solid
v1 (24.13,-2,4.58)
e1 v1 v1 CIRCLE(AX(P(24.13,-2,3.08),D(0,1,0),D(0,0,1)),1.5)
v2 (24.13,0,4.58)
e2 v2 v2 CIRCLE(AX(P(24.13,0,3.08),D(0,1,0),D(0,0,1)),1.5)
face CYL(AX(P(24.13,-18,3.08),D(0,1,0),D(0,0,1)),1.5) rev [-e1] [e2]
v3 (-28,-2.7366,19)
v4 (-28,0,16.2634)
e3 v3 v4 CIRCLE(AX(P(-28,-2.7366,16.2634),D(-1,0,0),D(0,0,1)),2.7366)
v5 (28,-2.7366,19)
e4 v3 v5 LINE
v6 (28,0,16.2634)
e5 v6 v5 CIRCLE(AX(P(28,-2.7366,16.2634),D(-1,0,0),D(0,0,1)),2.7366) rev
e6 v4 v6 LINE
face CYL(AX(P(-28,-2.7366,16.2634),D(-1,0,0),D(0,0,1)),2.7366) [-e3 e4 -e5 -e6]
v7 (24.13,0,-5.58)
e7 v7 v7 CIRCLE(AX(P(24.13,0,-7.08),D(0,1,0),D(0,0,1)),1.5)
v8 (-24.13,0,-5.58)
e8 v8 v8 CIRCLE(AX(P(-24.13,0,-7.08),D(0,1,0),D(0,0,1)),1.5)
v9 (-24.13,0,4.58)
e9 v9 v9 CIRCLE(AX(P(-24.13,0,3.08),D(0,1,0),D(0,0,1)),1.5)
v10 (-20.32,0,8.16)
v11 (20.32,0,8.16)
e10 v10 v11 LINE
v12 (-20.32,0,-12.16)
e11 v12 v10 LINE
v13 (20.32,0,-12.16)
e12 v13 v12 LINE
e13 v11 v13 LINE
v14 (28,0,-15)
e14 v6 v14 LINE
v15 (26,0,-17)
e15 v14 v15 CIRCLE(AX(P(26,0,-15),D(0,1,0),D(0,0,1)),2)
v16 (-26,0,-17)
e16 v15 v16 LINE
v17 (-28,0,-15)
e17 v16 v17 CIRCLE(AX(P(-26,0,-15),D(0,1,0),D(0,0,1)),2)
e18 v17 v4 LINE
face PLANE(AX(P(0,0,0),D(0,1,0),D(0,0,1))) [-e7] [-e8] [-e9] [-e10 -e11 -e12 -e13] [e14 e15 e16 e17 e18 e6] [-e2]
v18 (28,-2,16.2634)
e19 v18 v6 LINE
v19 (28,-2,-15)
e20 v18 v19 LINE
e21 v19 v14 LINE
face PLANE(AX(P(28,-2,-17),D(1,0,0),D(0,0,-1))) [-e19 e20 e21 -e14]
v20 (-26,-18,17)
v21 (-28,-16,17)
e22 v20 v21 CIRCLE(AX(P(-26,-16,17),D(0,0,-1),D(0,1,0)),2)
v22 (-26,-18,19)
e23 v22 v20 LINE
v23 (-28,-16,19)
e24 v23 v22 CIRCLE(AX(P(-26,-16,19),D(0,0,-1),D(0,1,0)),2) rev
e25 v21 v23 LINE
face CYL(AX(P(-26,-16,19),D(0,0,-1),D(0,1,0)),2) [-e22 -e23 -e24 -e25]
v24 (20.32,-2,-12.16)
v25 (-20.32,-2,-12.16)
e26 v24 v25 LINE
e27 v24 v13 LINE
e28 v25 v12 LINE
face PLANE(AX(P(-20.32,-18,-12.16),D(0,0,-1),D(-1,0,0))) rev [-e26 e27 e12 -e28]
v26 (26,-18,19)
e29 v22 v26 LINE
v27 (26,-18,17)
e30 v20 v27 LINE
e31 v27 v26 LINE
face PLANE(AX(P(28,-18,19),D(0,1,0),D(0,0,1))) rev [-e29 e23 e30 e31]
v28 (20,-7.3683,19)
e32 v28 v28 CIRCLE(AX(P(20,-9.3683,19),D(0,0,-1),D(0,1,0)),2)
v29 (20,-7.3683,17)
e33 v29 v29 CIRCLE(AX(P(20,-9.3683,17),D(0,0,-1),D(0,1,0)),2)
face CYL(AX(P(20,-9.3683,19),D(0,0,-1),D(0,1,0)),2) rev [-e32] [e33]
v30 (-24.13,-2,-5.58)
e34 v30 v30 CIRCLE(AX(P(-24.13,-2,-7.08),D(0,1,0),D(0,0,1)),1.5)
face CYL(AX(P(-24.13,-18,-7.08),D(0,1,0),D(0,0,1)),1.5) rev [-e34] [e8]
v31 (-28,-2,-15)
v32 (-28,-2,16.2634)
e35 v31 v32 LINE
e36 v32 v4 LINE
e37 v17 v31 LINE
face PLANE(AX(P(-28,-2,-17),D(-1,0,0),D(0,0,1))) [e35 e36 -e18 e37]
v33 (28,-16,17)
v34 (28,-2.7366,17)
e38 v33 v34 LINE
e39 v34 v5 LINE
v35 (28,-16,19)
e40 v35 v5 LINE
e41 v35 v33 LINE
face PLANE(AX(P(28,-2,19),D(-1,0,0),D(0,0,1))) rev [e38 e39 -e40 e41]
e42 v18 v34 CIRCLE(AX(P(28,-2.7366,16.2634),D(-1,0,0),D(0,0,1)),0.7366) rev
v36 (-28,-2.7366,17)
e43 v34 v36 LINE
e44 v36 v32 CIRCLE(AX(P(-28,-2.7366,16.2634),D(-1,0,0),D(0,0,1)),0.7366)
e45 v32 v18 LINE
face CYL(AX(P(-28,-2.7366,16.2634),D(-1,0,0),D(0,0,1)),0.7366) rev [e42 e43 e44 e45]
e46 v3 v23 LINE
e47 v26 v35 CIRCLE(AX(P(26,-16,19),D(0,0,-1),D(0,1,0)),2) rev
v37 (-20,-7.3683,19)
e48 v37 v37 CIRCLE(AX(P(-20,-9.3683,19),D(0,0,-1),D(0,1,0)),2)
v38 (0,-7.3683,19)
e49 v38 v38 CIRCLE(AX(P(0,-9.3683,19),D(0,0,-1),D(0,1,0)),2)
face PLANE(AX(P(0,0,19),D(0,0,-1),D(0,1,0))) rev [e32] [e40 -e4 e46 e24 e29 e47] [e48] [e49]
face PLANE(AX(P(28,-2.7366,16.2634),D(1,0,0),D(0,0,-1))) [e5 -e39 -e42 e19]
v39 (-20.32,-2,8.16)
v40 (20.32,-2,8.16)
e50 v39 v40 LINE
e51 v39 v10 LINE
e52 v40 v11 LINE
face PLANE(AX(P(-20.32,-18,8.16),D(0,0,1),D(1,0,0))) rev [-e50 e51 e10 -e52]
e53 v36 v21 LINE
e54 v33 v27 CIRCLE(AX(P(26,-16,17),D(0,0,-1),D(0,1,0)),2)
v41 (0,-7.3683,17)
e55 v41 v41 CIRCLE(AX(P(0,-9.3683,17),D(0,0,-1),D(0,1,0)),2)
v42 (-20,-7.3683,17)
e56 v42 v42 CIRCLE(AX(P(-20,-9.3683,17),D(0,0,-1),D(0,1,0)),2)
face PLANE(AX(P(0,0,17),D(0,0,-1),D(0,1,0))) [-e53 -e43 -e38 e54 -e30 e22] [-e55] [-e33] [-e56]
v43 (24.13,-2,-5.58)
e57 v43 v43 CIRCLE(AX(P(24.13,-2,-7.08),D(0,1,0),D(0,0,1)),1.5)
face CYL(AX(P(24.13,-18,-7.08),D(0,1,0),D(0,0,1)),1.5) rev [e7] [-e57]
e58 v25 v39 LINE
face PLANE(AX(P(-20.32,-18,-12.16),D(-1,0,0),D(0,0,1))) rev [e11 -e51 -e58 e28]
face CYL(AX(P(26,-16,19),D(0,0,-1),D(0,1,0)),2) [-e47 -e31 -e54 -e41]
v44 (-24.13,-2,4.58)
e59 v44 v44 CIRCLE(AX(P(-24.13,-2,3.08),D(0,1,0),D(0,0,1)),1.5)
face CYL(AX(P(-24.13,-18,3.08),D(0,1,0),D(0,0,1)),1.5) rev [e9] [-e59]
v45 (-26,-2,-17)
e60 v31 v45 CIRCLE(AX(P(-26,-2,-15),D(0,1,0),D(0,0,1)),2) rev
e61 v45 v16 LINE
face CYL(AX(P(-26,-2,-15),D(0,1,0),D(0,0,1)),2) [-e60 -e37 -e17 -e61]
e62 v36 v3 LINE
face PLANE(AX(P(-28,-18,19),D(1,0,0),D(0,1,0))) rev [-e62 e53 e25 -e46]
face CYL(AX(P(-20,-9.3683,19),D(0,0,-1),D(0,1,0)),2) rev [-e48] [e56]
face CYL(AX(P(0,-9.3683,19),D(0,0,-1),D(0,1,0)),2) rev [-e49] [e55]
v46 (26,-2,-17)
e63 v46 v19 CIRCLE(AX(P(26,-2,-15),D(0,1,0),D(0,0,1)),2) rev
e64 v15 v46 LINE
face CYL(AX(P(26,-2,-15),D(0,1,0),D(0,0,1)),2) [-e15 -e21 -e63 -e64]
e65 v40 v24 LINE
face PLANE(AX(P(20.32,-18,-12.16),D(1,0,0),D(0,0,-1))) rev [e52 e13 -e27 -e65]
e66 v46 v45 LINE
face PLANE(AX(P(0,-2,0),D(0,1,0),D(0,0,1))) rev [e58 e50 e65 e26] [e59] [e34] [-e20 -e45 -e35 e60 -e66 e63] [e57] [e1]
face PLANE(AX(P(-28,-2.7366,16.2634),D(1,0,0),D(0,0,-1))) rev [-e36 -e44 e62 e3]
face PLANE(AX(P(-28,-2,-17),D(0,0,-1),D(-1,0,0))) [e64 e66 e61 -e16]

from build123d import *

# Parameters (mm, degrees)
SKETCH1_W                    = 56
SKETCH1_H                    = 34
BASE_FLANGE1_DEPTH           = 2
EDGE_FLANGE1_STRIP_W         = 9.4732
EDGE_FLANGE1_STRIP_H         = 2
EDGE_FLANGE1_STRIP_CUT_DEPTH = 56
EDGE_FLANGE1_DEPTH           = 56
SKETCH9_W                    = 40.64
SKETCH9_H                    = 20.32
CUT_EXTRUDE1_DEPTH           = 39.327535793
SKETCH10_R                   = 1.5
CUT_EXTRUDE2_DEPTH           = 39.327535793
FILLET1_R                    = 2
SKETCH11_R                   = 2
CUT_EXTRUDE3_DEPTH           = 48.581509013


# Sheet-metal steps are written as plain solids
with BuildPart() as part:
    # Sketch1 → Base-Flange1 (new body)
    with BuildSketch(Plane(origin=(0, 0, 0), x_dir=(1, 0, 0), z_dir=(0, 1, 0))):
        Rectangle(SKETCH1_W, SKETCH1_H)
    extrude(amount=-BASE_FLANGE1_DEPTH)

    # Edge-Flange1 strip (across the edge) → Edge-Flange1 strip cut (cut)
    with BuildSketch(Plane(origin=(28, -2, 17), x_dir=(0, 0, -1), z_dir=(-1, 0, 0))):
        with Locations((-4, -1)):
            Rectangle(EDGE_FLANGE1_STRIP_W, EDGE_FLANGE1_STRIP_H)
    extrude(amount=EDGE_FLANGE1_STRIP_CUT_DEPTH, mode=Mode.SUBTRACT)

    # Edge-Flange1 section (across the edge) → Edge-Flange1 (add)
    with BuildSketch(Plane(origin=(28, -2, 17), x_dir=(0, 0, -1), z_dir=(-1, 0, 0))):
        with BuildLine():
            Line((-2, 0.7366), (-2, 16))
            Line((-2, 16), (0, 16))
            Line((0, 16), (0, 0.7366))
            ThreePointArc((0, 0.7366), (0.215745145, 0.215745145), (0.7366, 0))
            Line((0.7366, 0), (0.7366, -2))
            ThreePointArc((0.7366, -2), (-1.198468417, -1.198468417), (-2, 0.7366))
        make_face()
    extrude(amount=EDGE_FLANGE1_DEPTH)

    # Sketch9 → Cut-Extrude1 (cut, through all)
    with BuildSketch(Plane(origin=(0, 0, 0), x_dir=(1, 0, 0), z_dir=(0, 1, 0))):
        with Locations((0, 2)):
            Rectangle(SKETCH9_W, SKETCH9_H)
    extrude(amount=-CUT_EXTRUDE1_DEPTH, mode=Mode.SUBTRACT)

    # Sketch10 → Cut-Extrude2 (cut, through all)
    with BuildSketch(Plane(origin=(0, 0, 0), x_dir=(1, 0, 0), z_dir=(0, 1, 0))):
        with Locations(Location((-24.13, 7.08, 0), (0, 0, 270))):
            Circle(SKETCH10_R)
        with Locations(Location((-24.13, -3.08, 0), (0, 0, 270))):
            Circle(SKETCH10_R)
        with Locations(Location((24.13, 7.08, 0), (0, 0, 270))):
            Circle(SKETCH10_R)
        with Locations(Location((24.13, -3.08, 0), (0, 0, 270))):
            Circle(SKETCH10_R)
    extrude(amount=-CUT_EXTRUDE2_DEPTH, mode=Mode.SUBTRACT)

    # Fillet1
    fillet1_edges = [part.edges().sort_by_distance(p)[0] for p in [
        (28, -18, 18),
        (-28, -18, 18),
        (-28, -1, -17),
        (28, -1, -17),
    ]]
    fillet(fillet1_edges, radius=FILLET1_R)

    # Sketch11 → Cut-Extrude3 (cut, through all)
    with BuildSketch(Plane(origin=(0, 0, 17), x_dir=(-1, 0, 0), z_dir=(0, 0, -1))):
        with Locations(Location((0, -9.3683, 0), (0, 0, 90))):
            Circle(SKETCH11_R)
        with Locations(Location((-20, -9.3683, 0), (0, 0, 90))):
            Circle(SKETCH11_R)
        with Locations(Location((20, -9.3683, 0), (0, 0, 90))):
            Circle(SKETCH11_R)
    extrude(amount=-CUT_EXTRUDE3_DEPTH, mode=Mode.SUBTRACT)


solid = part.part
